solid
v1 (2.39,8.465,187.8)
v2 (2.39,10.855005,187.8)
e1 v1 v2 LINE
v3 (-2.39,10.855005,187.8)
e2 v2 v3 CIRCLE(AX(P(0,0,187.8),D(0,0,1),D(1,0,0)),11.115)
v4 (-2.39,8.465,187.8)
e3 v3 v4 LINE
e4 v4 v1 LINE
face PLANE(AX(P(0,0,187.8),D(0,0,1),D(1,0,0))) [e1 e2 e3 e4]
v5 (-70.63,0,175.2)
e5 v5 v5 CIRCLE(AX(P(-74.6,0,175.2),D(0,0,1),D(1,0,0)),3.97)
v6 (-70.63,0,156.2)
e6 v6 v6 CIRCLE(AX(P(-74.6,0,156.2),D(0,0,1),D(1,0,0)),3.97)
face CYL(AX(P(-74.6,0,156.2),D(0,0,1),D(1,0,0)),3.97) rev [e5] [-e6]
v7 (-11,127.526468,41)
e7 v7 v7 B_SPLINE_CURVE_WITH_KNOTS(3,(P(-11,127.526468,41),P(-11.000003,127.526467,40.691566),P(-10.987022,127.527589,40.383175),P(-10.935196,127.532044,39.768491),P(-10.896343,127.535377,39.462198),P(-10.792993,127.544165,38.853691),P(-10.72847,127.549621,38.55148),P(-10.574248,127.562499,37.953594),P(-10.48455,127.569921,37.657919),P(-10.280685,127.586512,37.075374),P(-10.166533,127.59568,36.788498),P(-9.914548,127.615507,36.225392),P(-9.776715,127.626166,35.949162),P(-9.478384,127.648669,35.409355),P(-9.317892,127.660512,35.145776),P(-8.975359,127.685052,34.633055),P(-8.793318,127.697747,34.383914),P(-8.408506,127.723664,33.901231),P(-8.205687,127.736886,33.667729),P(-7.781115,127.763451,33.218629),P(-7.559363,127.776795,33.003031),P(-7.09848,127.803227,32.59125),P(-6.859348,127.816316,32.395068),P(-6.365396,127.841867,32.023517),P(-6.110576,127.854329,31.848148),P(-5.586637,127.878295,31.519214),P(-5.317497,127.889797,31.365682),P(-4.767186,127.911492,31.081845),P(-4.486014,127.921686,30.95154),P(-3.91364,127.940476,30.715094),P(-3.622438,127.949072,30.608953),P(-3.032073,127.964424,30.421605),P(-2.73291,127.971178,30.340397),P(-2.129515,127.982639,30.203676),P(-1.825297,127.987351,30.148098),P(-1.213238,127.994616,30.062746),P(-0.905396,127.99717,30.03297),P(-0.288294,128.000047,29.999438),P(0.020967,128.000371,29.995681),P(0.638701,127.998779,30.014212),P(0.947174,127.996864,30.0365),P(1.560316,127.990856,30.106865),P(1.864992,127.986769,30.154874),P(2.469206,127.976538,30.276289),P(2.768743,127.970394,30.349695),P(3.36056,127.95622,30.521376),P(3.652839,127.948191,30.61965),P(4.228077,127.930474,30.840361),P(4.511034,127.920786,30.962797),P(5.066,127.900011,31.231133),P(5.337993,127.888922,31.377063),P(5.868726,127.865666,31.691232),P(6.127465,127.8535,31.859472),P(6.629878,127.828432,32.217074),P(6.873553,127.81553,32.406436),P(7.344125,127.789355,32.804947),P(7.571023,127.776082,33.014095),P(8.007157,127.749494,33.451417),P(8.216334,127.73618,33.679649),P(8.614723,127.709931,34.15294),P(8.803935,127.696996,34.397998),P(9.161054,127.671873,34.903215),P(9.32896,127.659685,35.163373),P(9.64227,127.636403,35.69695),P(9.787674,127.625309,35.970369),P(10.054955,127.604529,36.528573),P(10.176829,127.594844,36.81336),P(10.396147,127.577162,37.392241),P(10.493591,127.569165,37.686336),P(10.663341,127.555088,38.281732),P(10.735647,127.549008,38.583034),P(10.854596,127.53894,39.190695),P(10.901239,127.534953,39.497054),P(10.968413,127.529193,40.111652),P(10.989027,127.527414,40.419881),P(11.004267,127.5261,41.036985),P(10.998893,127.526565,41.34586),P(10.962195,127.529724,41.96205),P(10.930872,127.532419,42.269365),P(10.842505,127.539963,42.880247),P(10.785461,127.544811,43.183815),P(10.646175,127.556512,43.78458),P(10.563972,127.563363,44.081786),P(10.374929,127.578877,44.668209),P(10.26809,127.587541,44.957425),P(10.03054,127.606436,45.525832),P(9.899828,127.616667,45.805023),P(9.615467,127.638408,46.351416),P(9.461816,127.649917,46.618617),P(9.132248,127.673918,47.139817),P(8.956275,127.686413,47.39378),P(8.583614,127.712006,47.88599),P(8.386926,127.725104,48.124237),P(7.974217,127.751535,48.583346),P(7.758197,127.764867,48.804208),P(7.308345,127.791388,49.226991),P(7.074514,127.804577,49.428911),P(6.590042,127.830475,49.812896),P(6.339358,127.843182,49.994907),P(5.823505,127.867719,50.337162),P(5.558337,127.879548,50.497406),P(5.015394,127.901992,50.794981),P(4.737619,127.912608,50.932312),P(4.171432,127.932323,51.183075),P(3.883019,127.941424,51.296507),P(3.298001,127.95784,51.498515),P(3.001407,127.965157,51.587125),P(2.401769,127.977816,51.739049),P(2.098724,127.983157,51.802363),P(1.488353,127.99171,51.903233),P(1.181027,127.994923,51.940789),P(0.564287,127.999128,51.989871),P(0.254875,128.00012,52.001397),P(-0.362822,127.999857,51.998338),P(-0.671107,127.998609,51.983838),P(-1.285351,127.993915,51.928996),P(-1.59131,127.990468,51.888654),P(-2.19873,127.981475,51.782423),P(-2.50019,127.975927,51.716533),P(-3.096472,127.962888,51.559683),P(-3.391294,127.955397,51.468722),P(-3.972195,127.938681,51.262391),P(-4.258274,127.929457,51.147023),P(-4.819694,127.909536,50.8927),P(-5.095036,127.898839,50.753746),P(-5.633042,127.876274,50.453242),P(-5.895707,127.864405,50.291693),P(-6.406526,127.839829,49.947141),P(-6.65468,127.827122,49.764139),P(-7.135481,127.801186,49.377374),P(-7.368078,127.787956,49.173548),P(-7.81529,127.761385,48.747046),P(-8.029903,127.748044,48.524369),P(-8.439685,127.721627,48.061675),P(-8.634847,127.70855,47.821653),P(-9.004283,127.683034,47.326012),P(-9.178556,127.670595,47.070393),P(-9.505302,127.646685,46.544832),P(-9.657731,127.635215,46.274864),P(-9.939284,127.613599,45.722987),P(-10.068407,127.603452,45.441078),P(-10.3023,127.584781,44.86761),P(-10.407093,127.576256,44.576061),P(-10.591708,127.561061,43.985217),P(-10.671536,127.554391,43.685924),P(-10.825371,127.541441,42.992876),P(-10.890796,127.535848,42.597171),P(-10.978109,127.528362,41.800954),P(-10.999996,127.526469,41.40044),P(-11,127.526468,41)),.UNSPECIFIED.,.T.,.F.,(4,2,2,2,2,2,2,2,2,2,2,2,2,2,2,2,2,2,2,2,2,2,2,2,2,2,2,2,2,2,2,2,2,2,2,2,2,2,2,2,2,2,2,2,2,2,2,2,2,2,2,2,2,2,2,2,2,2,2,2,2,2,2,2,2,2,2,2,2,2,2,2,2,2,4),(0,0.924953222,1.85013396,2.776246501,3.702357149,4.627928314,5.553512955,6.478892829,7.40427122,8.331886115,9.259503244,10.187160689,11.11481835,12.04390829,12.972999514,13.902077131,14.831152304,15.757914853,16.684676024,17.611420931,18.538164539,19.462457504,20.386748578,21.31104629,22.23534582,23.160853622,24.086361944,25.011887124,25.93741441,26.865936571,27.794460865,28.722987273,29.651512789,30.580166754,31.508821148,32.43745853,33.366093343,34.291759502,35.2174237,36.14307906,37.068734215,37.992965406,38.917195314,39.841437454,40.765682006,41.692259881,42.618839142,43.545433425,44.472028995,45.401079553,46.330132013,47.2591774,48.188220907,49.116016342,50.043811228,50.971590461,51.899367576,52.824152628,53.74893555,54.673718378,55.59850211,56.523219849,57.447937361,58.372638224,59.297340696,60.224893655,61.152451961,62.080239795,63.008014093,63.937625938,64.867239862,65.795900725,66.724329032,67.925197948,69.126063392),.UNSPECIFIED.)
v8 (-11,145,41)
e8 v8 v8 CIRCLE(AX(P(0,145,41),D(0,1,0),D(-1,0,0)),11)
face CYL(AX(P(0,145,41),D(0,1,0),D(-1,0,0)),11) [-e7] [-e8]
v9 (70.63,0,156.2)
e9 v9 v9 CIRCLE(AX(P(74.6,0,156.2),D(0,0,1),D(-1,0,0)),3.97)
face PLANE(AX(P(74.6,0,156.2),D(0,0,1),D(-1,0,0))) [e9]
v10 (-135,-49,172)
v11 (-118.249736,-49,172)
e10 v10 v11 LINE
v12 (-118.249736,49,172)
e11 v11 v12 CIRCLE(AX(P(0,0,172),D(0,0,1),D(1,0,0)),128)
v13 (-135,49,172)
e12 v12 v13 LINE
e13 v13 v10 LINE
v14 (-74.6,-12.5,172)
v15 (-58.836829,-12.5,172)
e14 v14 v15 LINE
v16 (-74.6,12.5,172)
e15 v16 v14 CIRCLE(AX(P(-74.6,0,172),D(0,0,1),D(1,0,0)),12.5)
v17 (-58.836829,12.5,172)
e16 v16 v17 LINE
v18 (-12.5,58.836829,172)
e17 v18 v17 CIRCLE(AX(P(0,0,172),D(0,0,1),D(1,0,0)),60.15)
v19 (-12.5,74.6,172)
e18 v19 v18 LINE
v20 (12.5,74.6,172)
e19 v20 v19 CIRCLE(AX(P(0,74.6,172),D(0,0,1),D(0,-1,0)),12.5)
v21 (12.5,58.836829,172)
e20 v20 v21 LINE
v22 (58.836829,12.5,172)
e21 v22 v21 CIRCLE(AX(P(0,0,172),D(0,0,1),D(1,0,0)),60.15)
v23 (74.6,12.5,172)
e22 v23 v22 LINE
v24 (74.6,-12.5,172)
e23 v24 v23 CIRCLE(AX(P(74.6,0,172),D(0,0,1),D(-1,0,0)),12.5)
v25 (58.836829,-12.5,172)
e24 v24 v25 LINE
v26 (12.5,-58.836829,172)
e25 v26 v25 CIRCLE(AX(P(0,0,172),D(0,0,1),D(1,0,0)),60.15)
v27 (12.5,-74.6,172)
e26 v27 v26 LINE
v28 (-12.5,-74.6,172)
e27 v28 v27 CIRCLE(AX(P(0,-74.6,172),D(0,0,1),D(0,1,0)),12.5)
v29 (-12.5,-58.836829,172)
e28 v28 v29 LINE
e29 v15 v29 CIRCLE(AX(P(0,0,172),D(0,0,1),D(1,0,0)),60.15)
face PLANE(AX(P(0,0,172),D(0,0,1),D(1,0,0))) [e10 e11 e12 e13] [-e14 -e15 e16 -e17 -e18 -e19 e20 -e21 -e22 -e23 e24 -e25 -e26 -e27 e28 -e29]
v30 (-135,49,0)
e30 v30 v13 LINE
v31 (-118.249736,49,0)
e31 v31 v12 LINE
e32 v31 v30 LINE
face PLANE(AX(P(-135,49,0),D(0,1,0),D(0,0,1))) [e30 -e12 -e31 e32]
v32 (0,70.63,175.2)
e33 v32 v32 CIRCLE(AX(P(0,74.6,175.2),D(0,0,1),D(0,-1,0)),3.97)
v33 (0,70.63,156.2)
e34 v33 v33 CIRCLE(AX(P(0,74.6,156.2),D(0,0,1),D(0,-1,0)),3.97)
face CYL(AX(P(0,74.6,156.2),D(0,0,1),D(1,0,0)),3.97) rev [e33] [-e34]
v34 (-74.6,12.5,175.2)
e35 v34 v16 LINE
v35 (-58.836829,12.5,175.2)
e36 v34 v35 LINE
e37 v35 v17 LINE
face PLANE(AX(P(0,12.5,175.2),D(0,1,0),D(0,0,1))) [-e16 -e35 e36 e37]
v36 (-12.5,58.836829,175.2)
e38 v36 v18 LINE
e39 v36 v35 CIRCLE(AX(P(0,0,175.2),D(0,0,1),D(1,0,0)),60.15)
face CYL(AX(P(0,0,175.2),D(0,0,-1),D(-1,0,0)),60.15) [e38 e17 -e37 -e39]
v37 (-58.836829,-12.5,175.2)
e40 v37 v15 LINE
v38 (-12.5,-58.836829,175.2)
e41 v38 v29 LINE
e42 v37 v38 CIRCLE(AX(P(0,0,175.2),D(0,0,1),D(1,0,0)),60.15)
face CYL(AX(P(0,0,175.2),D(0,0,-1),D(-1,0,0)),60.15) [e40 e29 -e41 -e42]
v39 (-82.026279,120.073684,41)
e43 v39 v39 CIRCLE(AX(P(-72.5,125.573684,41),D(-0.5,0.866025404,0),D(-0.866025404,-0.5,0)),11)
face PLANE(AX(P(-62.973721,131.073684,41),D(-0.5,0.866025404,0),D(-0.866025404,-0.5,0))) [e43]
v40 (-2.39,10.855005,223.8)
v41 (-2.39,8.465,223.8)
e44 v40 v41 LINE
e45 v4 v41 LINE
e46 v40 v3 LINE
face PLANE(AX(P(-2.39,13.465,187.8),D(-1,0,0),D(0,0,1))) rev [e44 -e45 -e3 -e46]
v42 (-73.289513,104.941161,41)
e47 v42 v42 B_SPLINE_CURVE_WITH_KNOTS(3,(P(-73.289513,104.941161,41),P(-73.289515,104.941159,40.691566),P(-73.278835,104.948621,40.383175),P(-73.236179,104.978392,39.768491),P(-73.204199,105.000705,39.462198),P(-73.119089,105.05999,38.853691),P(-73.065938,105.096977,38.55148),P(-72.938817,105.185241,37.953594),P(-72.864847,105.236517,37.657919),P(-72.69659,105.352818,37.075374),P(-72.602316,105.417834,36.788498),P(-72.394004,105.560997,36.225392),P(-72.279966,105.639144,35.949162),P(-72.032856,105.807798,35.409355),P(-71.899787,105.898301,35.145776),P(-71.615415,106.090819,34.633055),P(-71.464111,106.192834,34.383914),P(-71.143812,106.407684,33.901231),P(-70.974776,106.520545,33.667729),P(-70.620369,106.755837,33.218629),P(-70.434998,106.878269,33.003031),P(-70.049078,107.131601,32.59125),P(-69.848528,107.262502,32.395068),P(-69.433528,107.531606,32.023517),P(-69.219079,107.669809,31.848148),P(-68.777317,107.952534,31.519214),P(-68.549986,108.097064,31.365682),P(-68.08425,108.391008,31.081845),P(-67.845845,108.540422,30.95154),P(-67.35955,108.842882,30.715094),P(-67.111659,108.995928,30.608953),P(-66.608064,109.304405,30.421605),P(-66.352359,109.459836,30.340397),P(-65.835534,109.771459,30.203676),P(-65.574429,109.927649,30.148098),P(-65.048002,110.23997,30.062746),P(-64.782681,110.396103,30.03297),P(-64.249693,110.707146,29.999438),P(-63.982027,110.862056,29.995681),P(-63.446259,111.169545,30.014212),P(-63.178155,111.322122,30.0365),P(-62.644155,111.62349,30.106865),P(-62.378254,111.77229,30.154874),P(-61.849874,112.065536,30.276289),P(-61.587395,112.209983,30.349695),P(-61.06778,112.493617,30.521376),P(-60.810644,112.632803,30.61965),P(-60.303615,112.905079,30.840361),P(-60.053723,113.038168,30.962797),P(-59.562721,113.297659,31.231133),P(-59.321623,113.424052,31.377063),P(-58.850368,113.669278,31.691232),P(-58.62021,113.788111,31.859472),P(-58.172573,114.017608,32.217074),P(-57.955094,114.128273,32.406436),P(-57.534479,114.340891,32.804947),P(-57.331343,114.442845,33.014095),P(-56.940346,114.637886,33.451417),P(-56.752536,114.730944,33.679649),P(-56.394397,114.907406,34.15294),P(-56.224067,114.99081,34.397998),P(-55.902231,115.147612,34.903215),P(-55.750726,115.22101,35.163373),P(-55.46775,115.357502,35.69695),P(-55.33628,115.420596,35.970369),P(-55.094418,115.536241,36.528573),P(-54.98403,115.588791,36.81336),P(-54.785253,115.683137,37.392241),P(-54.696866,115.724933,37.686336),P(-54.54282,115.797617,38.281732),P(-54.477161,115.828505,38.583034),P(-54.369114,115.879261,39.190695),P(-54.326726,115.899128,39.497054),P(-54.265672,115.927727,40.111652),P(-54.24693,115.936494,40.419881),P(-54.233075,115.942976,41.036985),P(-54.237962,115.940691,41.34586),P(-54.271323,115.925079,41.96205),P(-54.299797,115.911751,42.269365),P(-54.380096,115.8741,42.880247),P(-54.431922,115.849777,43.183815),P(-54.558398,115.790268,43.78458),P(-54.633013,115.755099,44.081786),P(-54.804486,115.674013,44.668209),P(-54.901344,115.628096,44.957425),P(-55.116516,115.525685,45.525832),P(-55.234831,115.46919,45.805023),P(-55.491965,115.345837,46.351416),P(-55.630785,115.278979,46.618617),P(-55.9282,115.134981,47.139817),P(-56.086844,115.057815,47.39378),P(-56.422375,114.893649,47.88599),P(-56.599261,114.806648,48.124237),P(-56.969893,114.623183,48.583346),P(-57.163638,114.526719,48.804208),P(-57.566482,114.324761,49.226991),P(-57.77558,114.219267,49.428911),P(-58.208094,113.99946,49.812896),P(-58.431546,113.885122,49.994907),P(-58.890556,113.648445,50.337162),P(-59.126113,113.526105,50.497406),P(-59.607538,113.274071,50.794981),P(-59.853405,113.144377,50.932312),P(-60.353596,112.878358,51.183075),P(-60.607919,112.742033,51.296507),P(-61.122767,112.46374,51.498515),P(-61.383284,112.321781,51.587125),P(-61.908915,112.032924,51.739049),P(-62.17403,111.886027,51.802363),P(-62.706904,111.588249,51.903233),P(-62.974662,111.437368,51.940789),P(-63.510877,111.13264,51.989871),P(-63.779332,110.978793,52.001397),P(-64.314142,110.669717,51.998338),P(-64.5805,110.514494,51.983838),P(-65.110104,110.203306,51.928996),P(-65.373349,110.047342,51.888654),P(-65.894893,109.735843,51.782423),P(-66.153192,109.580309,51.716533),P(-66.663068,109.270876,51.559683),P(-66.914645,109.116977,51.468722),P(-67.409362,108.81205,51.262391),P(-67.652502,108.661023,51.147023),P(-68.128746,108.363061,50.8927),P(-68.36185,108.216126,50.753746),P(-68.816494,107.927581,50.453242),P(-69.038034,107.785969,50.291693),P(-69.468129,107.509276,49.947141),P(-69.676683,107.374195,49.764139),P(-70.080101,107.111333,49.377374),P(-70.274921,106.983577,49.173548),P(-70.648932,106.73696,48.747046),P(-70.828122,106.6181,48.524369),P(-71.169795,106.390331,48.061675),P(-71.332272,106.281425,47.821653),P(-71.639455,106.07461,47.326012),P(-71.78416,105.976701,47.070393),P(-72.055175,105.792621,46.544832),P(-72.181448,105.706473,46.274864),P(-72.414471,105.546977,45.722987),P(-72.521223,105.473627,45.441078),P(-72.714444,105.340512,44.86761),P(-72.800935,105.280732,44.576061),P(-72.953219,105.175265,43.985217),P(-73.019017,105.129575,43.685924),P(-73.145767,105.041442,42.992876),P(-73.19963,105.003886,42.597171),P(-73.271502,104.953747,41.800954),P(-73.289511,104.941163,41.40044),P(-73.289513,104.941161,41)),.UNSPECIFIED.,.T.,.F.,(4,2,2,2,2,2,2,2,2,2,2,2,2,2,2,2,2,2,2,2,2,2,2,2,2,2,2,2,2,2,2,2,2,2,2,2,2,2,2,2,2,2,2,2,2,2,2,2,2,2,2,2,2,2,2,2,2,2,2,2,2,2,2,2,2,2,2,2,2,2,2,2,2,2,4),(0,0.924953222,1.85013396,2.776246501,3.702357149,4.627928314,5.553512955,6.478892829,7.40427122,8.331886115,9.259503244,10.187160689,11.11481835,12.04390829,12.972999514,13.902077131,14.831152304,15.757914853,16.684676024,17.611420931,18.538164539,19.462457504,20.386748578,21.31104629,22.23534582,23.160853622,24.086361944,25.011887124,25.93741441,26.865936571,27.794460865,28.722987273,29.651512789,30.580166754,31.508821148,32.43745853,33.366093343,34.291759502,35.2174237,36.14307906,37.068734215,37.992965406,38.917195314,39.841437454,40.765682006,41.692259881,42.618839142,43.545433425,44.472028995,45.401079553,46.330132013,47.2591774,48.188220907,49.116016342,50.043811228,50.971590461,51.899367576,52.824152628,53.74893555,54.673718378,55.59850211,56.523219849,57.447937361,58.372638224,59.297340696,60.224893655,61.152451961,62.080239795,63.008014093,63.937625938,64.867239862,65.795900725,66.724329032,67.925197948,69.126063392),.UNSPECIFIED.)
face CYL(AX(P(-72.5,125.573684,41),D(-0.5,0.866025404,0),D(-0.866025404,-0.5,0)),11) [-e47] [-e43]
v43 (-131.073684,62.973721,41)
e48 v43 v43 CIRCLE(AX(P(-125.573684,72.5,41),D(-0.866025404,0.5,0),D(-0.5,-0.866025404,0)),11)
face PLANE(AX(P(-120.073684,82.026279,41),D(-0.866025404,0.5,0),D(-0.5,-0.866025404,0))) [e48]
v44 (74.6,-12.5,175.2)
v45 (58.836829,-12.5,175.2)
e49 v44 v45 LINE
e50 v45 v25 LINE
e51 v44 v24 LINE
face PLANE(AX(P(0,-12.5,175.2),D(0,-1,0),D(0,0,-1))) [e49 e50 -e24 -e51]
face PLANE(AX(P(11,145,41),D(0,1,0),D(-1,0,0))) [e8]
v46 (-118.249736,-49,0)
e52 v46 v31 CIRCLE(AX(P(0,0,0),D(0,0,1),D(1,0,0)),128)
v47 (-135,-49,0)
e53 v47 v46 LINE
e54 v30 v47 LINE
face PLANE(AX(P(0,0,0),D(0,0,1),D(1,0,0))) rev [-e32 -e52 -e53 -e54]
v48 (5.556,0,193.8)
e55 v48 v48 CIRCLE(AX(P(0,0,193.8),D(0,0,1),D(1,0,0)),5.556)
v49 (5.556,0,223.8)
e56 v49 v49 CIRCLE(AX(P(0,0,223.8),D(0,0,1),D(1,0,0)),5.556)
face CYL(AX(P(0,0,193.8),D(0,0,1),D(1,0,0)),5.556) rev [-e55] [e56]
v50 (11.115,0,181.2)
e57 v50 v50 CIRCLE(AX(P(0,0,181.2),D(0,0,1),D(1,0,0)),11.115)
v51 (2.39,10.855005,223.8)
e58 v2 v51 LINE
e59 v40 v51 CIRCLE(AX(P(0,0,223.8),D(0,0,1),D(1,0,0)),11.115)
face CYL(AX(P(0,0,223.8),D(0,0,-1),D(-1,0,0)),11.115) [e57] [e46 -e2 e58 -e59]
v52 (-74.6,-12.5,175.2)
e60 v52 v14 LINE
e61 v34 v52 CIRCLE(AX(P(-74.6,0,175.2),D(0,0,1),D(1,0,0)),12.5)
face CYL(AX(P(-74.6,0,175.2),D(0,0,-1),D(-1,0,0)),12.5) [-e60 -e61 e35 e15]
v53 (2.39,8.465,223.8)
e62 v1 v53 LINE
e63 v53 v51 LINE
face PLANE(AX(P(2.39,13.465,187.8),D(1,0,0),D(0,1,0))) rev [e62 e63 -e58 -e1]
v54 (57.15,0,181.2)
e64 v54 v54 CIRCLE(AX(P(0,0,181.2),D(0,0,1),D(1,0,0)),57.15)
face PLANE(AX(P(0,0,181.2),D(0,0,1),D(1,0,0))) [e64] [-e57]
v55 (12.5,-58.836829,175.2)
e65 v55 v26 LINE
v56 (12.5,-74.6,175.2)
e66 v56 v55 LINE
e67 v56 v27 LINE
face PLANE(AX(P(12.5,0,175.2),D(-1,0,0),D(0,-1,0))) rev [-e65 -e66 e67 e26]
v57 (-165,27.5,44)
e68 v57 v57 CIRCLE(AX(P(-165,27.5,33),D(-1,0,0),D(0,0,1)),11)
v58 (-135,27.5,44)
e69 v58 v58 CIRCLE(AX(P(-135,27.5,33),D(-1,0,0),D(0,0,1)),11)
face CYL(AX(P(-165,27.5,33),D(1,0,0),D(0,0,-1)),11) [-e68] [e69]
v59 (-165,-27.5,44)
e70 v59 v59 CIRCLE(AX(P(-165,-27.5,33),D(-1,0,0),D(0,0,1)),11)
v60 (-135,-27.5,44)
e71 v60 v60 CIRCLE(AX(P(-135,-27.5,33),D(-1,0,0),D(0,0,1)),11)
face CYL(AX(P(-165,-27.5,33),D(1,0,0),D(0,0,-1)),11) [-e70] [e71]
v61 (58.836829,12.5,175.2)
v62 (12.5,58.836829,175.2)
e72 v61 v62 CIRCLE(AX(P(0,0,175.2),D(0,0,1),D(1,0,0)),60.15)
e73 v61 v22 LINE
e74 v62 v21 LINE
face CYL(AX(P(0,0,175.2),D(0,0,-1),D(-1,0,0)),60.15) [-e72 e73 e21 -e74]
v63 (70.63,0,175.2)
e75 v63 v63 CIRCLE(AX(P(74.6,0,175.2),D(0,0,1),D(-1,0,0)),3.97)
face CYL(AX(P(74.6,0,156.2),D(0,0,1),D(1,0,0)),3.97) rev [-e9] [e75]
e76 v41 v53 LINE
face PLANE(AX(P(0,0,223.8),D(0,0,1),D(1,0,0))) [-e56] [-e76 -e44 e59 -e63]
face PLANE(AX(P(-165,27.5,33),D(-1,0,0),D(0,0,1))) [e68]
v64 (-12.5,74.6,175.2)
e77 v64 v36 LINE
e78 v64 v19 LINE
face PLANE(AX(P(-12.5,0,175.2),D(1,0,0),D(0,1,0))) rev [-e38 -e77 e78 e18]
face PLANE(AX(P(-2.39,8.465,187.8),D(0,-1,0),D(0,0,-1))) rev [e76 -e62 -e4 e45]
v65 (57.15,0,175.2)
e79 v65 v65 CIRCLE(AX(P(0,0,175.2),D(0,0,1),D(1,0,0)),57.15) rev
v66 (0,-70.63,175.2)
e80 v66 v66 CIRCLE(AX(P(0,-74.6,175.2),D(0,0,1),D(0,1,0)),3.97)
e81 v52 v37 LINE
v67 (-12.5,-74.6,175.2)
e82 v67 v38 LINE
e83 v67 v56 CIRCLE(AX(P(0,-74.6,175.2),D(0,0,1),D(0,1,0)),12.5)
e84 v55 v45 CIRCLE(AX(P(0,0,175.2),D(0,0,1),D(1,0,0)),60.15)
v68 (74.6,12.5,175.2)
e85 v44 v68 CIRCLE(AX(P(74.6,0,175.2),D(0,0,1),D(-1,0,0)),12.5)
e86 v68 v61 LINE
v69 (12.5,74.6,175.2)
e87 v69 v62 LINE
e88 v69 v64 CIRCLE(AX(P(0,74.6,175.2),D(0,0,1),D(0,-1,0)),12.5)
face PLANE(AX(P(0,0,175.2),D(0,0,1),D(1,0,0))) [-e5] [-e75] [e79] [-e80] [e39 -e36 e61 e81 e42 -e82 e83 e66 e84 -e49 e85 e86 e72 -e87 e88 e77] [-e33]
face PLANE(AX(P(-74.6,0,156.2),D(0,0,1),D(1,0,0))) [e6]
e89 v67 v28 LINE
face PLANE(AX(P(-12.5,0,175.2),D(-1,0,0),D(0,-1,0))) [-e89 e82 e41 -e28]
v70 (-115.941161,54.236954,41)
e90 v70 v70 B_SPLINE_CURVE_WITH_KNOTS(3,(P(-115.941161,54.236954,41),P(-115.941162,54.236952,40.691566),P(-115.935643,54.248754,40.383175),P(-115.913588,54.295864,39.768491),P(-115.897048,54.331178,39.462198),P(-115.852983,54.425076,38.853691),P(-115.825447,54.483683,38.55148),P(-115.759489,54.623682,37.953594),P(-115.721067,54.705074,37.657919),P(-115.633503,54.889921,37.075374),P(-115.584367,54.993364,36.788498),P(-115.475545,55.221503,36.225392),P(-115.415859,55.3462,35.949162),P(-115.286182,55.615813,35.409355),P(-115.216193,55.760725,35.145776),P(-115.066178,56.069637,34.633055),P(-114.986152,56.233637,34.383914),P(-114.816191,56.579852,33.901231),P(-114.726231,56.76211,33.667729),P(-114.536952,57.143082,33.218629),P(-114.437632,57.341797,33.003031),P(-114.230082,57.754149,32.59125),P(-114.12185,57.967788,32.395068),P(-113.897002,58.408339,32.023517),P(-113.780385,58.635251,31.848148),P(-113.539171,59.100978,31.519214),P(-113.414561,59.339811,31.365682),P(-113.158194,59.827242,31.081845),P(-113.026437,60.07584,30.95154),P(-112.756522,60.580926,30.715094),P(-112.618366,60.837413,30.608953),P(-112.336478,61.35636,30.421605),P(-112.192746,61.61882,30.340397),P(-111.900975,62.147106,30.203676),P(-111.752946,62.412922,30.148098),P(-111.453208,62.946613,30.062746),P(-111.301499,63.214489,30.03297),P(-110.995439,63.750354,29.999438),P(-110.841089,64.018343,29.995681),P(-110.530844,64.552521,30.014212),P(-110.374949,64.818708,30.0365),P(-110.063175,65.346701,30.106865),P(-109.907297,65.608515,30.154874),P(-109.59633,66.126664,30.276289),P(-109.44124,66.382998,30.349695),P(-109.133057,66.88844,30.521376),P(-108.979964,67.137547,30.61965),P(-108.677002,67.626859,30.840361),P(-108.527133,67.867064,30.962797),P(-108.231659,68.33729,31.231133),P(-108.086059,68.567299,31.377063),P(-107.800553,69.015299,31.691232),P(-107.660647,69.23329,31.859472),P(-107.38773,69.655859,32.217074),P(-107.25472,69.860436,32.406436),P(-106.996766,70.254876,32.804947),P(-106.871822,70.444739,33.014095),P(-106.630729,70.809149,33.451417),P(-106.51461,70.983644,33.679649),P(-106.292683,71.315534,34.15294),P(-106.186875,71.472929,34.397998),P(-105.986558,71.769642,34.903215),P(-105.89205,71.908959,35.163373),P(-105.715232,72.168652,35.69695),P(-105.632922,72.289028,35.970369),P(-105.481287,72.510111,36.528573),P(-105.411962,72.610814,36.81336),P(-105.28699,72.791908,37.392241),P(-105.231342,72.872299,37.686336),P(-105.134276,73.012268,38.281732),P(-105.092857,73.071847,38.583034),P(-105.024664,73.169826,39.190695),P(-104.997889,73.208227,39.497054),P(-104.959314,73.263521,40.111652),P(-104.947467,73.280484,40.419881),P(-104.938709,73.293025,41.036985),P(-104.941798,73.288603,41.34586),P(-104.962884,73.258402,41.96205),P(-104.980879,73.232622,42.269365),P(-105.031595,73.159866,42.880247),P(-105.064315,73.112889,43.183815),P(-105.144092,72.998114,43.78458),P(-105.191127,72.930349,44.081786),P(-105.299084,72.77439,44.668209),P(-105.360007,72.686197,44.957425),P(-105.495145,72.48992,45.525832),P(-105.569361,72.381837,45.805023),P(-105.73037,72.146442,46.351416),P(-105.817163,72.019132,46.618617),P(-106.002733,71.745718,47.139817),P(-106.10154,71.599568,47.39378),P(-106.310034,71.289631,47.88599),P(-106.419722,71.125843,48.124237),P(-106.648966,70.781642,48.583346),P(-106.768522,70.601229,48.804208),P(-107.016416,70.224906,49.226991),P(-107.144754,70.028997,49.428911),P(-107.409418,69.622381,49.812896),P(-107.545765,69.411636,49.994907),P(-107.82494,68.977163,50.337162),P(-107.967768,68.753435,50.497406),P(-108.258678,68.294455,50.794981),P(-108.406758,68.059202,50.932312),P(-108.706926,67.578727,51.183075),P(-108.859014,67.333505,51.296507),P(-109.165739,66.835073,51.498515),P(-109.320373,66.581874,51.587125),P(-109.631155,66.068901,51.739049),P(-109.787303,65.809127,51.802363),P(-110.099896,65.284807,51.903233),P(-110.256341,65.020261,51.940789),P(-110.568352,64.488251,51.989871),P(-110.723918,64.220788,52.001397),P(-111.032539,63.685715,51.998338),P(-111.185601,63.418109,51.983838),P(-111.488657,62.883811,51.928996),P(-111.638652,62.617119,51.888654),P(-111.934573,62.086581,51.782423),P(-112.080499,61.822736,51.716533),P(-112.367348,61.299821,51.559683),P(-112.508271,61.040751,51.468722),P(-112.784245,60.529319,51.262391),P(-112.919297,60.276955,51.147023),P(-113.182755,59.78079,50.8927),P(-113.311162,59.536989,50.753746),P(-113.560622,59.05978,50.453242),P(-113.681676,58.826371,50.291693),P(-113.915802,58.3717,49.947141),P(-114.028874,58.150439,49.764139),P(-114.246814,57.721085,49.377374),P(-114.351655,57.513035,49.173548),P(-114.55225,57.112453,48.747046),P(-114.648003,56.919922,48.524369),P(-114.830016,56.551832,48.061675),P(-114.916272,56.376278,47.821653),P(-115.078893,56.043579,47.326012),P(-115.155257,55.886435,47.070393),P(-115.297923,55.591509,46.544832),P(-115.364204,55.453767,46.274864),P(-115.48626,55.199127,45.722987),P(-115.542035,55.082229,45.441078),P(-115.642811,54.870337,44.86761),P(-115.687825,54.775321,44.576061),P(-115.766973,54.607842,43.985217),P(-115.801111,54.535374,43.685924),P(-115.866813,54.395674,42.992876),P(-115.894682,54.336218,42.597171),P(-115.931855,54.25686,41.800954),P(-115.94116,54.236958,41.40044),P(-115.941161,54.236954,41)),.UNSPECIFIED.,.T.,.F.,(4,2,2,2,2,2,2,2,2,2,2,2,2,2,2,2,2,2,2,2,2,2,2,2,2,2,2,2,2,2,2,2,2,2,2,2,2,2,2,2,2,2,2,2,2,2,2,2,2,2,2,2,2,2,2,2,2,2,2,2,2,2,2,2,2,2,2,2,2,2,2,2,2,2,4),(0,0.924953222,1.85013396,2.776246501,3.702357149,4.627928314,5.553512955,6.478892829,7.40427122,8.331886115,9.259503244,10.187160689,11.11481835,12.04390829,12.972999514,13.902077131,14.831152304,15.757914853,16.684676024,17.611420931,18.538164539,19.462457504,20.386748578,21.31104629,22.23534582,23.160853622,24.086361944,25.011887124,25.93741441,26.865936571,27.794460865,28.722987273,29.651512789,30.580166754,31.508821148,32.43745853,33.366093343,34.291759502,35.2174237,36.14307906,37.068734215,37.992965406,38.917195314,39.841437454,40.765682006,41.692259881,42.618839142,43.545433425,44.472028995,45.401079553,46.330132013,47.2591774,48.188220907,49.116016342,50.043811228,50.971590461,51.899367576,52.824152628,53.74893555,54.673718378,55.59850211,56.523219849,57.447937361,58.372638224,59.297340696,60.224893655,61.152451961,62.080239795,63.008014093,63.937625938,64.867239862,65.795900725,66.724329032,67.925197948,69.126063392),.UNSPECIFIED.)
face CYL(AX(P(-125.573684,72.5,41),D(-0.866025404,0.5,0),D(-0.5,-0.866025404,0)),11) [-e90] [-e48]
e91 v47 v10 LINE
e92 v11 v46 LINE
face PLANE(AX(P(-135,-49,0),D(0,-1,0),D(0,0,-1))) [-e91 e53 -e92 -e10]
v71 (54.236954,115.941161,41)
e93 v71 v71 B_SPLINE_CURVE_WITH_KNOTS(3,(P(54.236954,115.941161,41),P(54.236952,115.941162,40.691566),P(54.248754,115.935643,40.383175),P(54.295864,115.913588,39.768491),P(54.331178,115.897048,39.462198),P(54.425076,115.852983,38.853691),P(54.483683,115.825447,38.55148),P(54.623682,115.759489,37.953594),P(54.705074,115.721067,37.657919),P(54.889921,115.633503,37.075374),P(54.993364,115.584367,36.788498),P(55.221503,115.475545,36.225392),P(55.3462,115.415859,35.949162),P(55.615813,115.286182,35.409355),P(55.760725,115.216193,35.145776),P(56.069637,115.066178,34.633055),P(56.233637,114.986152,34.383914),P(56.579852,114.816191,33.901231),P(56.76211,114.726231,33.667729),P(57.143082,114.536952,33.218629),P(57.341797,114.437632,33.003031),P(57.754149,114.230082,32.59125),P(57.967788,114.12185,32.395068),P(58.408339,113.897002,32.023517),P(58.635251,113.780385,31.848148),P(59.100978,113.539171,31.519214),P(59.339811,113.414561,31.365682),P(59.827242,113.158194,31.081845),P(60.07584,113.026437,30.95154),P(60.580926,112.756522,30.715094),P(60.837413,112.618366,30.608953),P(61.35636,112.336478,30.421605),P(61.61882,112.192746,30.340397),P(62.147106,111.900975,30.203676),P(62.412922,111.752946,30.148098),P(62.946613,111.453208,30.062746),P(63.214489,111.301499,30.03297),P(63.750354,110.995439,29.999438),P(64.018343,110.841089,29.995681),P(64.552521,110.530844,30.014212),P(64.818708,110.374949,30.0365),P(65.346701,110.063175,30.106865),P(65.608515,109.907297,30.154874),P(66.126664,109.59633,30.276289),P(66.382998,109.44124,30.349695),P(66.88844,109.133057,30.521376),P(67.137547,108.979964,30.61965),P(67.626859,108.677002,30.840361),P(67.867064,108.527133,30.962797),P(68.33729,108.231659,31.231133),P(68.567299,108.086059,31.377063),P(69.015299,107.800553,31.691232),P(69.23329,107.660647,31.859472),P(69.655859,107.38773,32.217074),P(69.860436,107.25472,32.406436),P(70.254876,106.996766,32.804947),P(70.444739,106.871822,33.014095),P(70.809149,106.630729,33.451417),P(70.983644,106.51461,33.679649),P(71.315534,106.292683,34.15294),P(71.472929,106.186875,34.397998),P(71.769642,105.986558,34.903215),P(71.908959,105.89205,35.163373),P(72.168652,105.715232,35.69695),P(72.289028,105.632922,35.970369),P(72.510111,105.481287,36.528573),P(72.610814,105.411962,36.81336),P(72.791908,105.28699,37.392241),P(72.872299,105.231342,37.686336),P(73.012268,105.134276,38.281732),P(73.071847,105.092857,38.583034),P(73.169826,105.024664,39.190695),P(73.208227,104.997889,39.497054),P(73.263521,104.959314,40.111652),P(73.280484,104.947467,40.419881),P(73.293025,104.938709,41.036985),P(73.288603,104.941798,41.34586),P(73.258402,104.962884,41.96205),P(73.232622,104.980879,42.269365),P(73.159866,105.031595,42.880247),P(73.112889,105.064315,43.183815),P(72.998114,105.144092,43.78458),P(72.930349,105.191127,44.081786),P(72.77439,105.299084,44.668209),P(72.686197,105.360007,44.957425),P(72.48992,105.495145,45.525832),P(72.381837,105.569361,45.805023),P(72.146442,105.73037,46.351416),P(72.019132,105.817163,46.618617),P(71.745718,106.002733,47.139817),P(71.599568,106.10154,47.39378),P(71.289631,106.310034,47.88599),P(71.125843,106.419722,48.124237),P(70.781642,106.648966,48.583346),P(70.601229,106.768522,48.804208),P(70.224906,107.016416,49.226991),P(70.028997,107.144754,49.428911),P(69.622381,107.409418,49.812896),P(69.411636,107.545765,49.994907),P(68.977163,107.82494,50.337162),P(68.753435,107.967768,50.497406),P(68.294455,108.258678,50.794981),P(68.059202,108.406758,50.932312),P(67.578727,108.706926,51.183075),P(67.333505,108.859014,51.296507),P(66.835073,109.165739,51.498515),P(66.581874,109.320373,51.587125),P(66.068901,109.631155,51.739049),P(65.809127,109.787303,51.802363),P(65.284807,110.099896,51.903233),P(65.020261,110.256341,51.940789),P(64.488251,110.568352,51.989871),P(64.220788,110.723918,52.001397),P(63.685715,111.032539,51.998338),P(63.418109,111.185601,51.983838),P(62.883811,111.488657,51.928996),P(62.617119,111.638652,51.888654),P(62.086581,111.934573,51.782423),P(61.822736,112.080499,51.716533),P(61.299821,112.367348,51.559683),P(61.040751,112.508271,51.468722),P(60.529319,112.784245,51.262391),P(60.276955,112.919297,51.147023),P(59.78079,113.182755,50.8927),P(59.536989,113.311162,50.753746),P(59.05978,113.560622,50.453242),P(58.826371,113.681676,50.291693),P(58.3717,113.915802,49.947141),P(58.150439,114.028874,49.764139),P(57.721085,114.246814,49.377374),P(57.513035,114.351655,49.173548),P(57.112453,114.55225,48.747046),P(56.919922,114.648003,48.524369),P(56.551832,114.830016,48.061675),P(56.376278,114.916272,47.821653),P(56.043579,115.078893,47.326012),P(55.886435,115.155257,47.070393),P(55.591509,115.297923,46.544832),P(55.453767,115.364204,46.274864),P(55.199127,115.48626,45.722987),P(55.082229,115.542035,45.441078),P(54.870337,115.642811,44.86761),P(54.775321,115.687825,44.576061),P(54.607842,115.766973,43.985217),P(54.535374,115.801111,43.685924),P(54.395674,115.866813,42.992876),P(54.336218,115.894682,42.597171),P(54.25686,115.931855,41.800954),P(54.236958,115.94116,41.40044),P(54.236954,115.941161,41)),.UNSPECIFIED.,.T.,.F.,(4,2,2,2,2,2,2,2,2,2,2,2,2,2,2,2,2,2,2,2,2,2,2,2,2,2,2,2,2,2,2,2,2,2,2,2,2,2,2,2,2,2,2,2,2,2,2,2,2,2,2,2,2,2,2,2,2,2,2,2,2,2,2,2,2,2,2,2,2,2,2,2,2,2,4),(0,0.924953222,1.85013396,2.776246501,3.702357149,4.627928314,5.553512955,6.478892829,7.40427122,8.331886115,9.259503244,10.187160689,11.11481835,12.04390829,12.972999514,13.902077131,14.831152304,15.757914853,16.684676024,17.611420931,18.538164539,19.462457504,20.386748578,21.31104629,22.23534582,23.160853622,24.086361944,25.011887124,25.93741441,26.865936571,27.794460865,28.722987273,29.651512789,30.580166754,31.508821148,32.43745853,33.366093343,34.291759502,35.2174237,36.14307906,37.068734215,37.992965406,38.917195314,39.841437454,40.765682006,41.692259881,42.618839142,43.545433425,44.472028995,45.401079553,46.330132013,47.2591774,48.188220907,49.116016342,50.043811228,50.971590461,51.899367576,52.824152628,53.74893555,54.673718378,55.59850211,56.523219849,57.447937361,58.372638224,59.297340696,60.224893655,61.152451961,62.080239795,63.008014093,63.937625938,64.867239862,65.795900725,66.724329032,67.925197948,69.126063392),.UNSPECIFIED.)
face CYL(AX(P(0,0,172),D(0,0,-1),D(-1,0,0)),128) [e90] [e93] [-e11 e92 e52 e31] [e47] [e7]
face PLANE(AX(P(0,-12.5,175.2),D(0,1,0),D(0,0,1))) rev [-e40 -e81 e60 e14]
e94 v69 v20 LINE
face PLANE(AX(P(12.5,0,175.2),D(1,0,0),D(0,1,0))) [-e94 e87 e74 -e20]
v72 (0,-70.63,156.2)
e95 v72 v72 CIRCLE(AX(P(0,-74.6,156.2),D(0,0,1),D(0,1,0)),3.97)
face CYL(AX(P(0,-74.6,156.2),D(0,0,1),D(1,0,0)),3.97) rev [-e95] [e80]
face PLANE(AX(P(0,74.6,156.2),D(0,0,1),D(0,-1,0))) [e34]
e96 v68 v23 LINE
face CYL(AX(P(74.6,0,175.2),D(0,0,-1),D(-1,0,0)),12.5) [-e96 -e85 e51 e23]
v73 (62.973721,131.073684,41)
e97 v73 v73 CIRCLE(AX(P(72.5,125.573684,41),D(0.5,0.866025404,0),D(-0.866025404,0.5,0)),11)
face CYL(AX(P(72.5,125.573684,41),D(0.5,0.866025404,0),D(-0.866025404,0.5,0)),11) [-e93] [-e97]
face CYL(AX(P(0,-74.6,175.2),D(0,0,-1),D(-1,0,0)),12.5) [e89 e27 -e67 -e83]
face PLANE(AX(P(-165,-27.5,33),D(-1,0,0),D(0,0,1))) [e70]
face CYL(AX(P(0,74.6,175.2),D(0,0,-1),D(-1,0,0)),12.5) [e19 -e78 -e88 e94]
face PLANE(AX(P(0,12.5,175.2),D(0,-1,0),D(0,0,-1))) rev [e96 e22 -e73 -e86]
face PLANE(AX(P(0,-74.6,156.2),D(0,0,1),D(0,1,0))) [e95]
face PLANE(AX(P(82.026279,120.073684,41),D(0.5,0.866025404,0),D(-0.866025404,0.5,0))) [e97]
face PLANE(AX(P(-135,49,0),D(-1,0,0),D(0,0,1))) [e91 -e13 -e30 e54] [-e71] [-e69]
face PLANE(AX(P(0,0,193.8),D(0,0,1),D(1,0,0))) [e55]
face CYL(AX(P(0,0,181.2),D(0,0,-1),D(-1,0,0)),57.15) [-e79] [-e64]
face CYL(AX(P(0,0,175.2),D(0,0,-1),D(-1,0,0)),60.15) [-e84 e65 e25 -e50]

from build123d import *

# Parameters (mm, degrees)
SZKIC1_R                    = 128
DODANIE_WYCI_GNI_CIE1_DEPTH = 172
SZKIC2_W                    = 135
SZKIC2_H                    = 98
DODANIE_WYCI_GNI_CIE2_DEPTH = 172
SZKIC3_R                    = 11
DODANIE_WYCI_GNI_CIE3_DEPTH = 30
SZKIC5_W                    = 11
SZKIC5_H                    = 25
SZYK_START                  = -145
SZYK_KO_OWY1_OUTLINE_R      = 11
SZYK_KO_OWY1_DEPTH          = 17.473532259
SZYK_KO_OWY1_2_OUTLINE_R    = 11
SZYK_KO_OWY1_2_DEPTH        = 17.473532259
SZYK_START_2                = 127.526467741
SZYK_KO_OWY1_3_OUTLINE_R    = 11
SZYK_KO_OWY1_3_DEPTH        = 17.473532259
SZKIC6_R                    = 57.15
DODANIE_WYCI_GNI_CIE4_DEPTH = 9.2
SZKIC7_R                    = 11.115
DODANIE_WYCI_GNI_CIE5_DEPTH = 42.6
SZKIC8_W                    = 4.78
SZKIC8_H                    = 5
WYTNIJ_WYCI_GNI_CIE1_DEPTH  = 36
SZKIC9_R                    = 5.556
WYTNIJ_WYCI_GNI_CIE2_DEPTH  = 30
DODANIE_WYCI_GNI_CIE6_DEPTH = 3.2
SZKIC11_R                   = 3.97
WYTNIJ_WYCI_GNI_CIE3_DEPTH  = 19
SZYK_KO_OWY2_COUNT          = 4
SZKIC12_R                   = 60.15
DODANIE_WYCI_GNI_CIE7_DEPTH = 3.2


# Read off the part's stored shape, not the designer's step: Szyk kołowy1
with BuildPart() as part:
    # Szkic1 → Dodanie-wyciągnięcie1 (new body)
    with BuildSketch(Plane.XY):
        Circle(SZKIC1_R)
    extrude(amount=DODANIE_WYCI_GNI_CIE1_DEPTH)

    # Szkic2 → Dodanie-wyciągnięcie2 (add)
    with BuildSketch(Plane.XY.offset(172)):
        with Locations((-67.5, 0)):
            Rectangle(SZKIC2_W, SZKIC2_H)
    extrude(amount=-DODANIE_WYCI_GNI_CIE2_DEPTH)

    # Szkic3 → Dodanie-wyciągnięcie3 (add)
    with BuildSketch(Plane.ZY.offset(135)):
        with Locations((33, 27.5)):
            Circle(SZKIC3_R)
        with Locations((33, -27.5)):
            Circle(SZKIC3_R)
    extrude(amount=DODANIE_WYCI_GNI_CIE3_DEPTH)

    # Szkic5 → Obrót1 (revolve)
    with BuildSketch(Plane(origin=(0, 0, 41), x_dir=(-1, 0, 0), z_dir=(0, 0, -1)), mode=Mode.PRIVATE) as obr_t1_sk:
        with Locations((-5.5, 132.5)):
            Rectangle(SZKIC5_W, SZKIC5_H)
    revolve(obr_t1_sk.sketch.rotate(Axis((0, 145, 41), (0, -1, 0)), 180), axis=Axis((0, 145, 41), (0, -1, 0)))

    # Szyk kołowy1 outline → Szyk kołowy1 (add)
    with BuildSketch(Plane(origin=(0, 0, 0), x_dir=(0.866025403784438, 0.500000000000001, 0), z_dir=(0.500000000000001, -0.866025403784438, 0)).offset(SZYK_START)):
        with Locations((0, 41)):
            Circle(SZYK_KO_OWY1_OUTLINE_R)
    extrude(amount=SZYK_KO_OWY1_DEPTH)

    # Szyk ko_owy1 2 outline → Szyk ko_owy1 2 (add)
    with BuildSketch(Plane(origin=(0, 0, 0), x_dir=(0.49999999999999767, 0.86602540378444, 0), z_dir=(0.8660254037844399, -0.49999999999999795, 0)).offset(SZYK_START)):
        with Locations((0, 41)):
            Circle(SZYK_KO_OWY1_2_OUTLINE_R)
    extrude(amount=SZYK_KO_OWY1_2_DEPTH)

    # Szyk ko_owy1 3 outline → Szyk ko_owy1 3 (add)
    with BuildSketch(Plane(origin=(0, 0, 0), x_dir=(0.866025403784438, -0.500000000000001, 0), z_dir=(0.500000000000001, 0.866025403784438, 0)).offset(SZYK_START_2)):
        with Locations((0, -41)):
            Circle(SZYK_KO_OWY1_3_OUTLINE_R)
    extrude(amount=SZYK_KO_OWY1_3_DEPTH)

    # Szkic6 → Dodanie-wyciągnięcie4 (add)
    with BuildSketch(Plane.XY.offset(172)):
        Circle(SZKIC6_R)
    extrude(amount=DODANIE_WYCI_GNI_CIE4_DEPTH)

    # Szkic7 → Dodanie-wyciągnięcie5 (add)
    with BuildSketch(Plane.XY.offset(181.2)):
        Circle(SZKIC7_R)
    extrude(amount=DODANIE_WYCI_GNI_CIE5_DEPTH)

    # Szkic8 → Wytnij-wyciągnięcie1 (cut)
    with BuildSketch(Plane.XY.offset(223.8)):
        with Locations((0, 10.965)):
            Rectangle(SZKIC8_W, SZKIC8_H)
    extrude(amount=-WYTNIJ_WYCI_GNI_CIE1_DEPTH, mode=Mode.SUBTRACT)

    # Szkic9 → Wytnij-wyciągnięcie2 (cut)
    with BuildSketch(Plane.XY.offset(223.8)):
        Circle(SZKIC9_R)
    extrude(amount=-WYTNIJ_WYCI_GNI_CIE2_DEPTH, mode=Mode.SUBTRACT)

    # Szkic10 → Dodanie-wyciągnięcie6 (add)
    with BuildSketch(Plane.XY.offset(172)):
        with BuildLine():
            Line((-73.545292167, 12.5), (-74.6, 12.5))
            ThreePointArc((-74.6, 12.5), (-87.1, 0), (-74.6, -12.5))
            Line((-74.6, -12.5), (-73.545292167, -12.5))
            Line((-73.545292167, -12.5), (-55.766230821, -12.5))
            ThreePointArc((-55.766230821, -12.5), (-57.15, 0), (-55.766230821, 12.5))
            Line((-55.766230821, 12.5), (-73.545292167, 12.5))
        make_face()
    dodanie_wyci_gni_cie6 = extrude(amount=DODANIE_WYCI_GNI_CIE6_DEPTH)

    # Szkic11 → Wytnij-wyciągnięcie3 (cut)
    with BuildSketch(Plane.XY.offset(175.2)):
        with Locations((-74.6, 0)):
            Circle(SZKIC11_R)
    wytnij_wyci_gni_cie3 = extrude(amount=-WYTNIJ_WYCI_GNI_CIE3_DEPTH, mode=Mode.SUBTRACT)

    # Szyk kołowy2: Dodanie-wyciągnięcie6, Wytnij-wyciągnięcie3 ×4 about axis
    szyk_ko_owy2_axis = Axis((0, 0, 0), (0, 0, 1))
    add([dodanie_wyci_gni_cie6.rotate(szyk_ko_owy2_axis, i * 360 / SZYK_KO_OWY2_COUNT) for i in range(1, SZYK_KO_OWY2_COUNT)])
    add([wytnij_wyci_gni_cie3.rotate(szyk_ko_owy2_axis, i * 360 / SZYK_KO_OWY2_COUNT) for i in range(1, SZYK_KO_OWY2_COUNT)], mode=Mode.SUBTRACT)

    # Szkic12 → Dodanie-wyciągnięcie7 (add)
    with BuildSketch(Plane.XY.offset(172)):
        Circle(SZKIC12_R)
    extrude(amount=DODANIE_WYCI_GNI_CIE7_DEPTH)


solid = part.part
